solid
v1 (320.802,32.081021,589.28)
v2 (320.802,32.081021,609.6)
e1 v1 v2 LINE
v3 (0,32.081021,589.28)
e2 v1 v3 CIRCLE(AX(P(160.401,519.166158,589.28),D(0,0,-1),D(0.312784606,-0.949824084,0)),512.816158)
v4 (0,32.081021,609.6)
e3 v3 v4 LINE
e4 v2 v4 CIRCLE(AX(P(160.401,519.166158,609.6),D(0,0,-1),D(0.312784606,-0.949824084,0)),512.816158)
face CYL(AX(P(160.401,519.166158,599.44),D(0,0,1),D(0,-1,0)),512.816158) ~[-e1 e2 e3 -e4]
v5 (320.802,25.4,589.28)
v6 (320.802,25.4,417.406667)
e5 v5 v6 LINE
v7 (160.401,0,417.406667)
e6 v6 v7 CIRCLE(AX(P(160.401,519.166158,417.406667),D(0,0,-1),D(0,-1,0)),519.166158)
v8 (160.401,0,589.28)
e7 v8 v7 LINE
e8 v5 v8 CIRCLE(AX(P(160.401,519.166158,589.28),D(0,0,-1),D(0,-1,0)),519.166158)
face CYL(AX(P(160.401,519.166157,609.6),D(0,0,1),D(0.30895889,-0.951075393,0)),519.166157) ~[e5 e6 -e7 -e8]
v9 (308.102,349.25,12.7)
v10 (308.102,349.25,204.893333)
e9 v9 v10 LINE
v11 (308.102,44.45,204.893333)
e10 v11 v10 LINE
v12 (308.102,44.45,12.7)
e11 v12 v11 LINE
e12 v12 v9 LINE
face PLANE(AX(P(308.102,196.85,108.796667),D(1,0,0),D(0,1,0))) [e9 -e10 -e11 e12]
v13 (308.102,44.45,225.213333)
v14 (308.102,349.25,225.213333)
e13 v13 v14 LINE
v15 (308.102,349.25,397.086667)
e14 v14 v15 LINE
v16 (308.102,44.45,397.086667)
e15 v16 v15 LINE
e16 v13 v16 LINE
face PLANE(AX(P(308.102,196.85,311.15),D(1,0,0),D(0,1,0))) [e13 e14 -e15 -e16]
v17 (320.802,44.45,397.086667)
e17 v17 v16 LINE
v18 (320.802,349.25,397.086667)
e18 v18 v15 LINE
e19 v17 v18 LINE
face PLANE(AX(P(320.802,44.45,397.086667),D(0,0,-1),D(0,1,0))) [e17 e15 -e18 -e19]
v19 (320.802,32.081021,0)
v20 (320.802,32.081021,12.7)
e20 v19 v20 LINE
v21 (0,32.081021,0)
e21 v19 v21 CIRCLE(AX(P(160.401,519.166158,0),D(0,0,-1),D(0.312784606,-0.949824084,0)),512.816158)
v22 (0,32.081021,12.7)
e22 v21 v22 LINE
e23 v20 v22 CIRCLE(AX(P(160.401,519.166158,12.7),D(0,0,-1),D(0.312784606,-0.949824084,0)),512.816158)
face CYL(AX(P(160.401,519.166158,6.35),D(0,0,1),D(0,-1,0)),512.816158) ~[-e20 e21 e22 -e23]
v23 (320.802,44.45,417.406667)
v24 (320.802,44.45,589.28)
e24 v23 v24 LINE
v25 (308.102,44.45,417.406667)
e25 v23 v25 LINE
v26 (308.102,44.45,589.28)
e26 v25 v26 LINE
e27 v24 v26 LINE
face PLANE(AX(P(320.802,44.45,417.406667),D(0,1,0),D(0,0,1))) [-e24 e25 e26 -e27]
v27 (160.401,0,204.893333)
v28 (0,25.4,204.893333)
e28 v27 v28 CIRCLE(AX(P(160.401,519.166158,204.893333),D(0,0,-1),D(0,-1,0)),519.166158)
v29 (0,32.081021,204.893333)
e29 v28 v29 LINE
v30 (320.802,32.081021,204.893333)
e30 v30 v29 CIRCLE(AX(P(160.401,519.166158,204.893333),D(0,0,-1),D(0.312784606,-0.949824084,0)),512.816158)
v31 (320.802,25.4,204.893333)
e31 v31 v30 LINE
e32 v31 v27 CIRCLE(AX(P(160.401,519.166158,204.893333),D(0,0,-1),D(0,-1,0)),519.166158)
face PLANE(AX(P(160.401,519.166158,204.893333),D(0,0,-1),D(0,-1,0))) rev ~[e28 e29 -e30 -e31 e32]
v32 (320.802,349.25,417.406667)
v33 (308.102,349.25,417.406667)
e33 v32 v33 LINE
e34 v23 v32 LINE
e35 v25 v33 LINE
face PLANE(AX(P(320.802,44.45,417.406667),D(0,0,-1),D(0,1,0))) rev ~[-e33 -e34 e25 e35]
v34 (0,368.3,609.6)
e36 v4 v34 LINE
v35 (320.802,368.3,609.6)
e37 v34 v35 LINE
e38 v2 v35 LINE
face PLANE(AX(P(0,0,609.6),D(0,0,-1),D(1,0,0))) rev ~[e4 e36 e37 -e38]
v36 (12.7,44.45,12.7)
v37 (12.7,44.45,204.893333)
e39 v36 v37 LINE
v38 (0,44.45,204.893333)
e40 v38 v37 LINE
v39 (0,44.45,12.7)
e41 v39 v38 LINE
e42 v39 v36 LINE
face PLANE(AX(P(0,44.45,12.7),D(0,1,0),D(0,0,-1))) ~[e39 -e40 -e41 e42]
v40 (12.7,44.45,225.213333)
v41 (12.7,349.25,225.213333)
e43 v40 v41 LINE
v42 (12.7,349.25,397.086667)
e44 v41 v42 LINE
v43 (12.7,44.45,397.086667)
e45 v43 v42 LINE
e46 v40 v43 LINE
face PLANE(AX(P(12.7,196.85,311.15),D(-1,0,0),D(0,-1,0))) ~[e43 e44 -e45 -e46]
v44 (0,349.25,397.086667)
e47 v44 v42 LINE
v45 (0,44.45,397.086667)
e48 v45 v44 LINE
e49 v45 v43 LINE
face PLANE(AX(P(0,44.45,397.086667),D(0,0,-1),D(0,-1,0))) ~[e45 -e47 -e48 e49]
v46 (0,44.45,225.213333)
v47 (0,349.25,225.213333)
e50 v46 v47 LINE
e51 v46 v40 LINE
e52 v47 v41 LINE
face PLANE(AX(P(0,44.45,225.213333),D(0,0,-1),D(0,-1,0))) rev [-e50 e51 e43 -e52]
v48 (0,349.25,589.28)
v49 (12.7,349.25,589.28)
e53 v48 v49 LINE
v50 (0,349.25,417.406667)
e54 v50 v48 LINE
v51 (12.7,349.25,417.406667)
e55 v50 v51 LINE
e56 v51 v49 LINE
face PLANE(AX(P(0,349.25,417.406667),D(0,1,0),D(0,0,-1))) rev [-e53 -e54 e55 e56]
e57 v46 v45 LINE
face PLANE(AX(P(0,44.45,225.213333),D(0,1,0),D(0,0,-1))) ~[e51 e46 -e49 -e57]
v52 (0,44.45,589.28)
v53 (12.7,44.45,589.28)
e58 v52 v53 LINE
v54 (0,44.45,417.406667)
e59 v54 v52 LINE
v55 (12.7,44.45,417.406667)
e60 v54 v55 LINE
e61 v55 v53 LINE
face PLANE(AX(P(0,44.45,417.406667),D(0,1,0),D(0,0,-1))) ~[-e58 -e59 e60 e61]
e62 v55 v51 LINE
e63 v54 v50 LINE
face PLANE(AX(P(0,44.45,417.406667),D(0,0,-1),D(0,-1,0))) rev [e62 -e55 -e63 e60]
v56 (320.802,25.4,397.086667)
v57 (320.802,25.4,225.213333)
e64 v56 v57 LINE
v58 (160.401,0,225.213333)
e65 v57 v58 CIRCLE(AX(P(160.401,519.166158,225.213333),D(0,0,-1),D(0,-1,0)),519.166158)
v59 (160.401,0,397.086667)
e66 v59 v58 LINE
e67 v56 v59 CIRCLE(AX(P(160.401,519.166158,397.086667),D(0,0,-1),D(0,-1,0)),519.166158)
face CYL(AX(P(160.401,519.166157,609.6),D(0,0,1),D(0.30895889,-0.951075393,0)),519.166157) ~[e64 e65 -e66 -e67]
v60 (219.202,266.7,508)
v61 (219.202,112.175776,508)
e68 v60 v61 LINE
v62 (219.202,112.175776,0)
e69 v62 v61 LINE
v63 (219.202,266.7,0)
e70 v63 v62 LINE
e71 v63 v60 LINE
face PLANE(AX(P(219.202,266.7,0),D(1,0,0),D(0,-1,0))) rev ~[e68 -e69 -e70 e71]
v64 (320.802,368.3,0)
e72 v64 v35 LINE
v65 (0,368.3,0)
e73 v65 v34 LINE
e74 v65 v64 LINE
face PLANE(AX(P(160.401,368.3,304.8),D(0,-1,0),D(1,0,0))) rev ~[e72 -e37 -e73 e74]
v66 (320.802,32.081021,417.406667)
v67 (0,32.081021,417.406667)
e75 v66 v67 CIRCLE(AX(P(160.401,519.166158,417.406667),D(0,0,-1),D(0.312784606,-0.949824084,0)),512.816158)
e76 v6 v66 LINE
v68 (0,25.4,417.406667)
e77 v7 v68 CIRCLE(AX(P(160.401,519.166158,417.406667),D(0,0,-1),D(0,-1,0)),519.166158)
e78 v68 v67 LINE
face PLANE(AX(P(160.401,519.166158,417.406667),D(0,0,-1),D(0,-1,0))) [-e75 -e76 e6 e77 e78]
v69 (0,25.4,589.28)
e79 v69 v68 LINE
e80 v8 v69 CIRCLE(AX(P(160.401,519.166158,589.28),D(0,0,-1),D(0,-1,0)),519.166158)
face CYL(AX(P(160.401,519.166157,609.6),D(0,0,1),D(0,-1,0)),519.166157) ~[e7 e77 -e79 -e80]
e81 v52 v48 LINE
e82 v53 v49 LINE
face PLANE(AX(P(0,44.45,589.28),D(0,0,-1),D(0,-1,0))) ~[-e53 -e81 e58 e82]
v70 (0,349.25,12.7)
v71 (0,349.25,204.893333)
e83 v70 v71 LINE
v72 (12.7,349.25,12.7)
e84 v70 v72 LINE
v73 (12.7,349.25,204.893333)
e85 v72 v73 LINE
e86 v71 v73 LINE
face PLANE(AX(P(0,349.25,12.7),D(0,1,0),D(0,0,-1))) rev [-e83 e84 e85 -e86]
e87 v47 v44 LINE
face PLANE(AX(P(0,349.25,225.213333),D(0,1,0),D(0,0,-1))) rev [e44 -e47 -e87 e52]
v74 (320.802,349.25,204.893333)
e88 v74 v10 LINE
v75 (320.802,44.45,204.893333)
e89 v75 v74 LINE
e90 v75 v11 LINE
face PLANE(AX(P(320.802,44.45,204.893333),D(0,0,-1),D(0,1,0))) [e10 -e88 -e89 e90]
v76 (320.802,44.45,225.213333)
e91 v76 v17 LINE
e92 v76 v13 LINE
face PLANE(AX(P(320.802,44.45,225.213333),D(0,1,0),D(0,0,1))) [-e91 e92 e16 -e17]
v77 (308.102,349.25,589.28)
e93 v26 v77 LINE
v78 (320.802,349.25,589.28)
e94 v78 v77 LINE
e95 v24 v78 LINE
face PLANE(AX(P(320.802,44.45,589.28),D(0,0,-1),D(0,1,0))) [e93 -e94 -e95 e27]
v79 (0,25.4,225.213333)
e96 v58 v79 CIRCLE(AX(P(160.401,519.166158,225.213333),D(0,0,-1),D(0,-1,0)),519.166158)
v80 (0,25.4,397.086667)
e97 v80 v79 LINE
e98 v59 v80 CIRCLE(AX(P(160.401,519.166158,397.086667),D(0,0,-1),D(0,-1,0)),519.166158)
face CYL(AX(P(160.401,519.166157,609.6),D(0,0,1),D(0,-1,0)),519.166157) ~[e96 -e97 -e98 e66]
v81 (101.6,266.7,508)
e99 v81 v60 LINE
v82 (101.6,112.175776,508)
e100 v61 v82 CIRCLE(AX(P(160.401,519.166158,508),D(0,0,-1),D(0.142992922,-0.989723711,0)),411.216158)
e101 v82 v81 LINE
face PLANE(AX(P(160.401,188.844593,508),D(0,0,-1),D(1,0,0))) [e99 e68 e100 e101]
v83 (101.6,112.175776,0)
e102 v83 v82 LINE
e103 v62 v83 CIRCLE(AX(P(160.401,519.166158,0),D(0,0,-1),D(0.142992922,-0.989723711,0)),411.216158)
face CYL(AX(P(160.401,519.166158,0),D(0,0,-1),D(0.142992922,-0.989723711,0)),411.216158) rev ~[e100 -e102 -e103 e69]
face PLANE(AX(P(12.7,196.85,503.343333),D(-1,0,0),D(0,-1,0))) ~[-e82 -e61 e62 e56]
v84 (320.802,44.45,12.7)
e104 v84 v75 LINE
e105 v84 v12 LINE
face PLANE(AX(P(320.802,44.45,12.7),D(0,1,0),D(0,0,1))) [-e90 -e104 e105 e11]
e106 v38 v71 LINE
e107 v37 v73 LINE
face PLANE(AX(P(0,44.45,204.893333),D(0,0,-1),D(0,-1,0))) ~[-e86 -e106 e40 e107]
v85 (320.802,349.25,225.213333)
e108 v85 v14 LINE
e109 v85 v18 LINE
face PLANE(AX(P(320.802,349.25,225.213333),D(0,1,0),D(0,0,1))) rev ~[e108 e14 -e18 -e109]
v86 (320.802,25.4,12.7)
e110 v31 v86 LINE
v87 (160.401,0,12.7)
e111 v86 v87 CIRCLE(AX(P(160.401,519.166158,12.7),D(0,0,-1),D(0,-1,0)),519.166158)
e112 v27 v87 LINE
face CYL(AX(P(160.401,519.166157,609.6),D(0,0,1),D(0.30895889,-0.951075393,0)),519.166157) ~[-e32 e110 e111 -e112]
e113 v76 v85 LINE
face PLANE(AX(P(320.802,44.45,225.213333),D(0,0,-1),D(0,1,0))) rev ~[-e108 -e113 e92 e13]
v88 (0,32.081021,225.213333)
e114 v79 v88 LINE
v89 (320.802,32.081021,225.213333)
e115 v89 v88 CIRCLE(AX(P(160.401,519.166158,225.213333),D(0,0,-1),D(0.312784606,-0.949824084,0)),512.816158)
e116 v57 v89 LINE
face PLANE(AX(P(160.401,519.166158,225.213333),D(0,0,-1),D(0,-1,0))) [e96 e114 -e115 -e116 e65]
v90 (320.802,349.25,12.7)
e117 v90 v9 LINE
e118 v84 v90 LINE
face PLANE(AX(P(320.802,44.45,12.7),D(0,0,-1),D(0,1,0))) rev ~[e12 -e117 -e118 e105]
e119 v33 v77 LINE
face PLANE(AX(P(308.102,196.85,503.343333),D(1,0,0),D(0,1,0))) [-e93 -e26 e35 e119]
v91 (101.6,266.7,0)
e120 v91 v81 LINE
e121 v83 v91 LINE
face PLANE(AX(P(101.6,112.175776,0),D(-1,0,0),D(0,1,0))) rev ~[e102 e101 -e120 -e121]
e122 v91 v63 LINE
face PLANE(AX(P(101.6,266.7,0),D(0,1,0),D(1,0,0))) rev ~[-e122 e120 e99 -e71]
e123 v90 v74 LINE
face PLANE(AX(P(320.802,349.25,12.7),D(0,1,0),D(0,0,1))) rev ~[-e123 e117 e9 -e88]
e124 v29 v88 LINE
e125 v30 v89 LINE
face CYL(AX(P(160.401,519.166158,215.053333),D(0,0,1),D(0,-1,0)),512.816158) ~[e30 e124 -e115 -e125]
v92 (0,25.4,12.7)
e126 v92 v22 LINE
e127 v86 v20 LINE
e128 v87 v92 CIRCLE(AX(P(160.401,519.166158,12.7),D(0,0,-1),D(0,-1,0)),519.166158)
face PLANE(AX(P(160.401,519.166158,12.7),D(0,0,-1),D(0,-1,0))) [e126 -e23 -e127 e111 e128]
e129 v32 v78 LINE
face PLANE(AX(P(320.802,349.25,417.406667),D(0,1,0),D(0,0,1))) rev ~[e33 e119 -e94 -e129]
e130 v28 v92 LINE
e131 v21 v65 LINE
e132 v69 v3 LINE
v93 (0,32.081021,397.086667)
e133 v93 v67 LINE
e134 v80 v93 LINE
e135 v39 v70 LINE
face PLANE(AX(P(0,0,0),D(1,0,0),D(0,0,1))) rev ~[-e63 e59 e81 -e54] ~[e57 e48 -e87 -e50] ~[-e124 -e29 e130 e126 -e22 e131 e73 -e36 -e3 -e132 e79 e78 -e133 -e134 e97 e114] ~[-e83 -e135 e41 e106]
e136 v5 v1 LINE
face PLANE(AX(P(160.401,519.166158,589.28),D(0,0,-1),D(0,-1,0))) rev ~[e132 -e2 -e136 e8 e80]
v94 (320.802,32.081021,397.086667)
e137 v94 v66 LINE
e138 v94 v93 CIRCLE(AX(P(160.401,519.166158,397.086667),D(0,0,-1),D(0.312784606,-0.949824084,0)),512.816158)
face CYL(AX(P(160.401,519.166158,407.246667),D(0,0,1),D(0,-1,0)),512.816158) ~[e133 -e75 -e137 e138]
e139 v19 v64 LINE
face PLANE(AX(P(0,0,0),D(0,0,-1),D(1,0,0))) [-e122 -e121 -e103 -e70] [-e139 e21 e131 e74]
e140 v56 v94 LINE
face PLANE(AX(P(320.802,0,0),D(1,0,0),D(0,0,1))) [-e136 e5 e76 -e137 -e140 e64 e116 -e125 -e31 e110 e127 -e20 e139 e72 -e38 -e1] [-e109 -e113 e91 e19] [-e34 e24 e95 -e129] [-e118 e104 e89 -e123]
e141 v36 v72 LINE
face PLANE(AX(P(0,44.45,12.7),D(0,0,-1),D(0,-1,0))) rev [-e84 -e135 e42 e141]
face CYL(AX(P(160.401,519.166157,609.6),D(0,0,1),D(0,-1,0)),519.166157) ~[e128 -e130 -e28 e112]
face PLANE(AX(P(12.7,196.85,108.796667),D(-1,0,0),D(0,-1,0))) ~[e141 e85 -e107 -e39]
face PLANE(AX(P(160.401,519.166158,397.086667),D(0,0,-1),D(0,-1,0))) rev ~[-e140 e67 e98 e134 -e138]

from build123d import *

# Parameters (mm, degrees)
F0_W      = 320.802
F0_H      = 609.6
F1_DEPTH  = 368.3
F3_DEPTH  = 609.601
F6_W      = 6.35
F6_H      = 20.32
F6_H_2    = 12.7
F8_W      = 304.8
F8_H      = 171.8733333333
F8_H_2    = 192.1933333333
F9_DEPTH  = 12.7
F11_DEPTH = 508


# Not quite as in the source:
# - a pattern or mirror of a feature is missing from the dataset's text; its kind, count and spacing are read off the source's solid


with BuildPart() as f1:
    # F0 (on Front) → F1 (new body)
    with BuildSketch(Plane.XZ):
        with Locations((160.401, 304.8)):
            Rectangle(F0_W, F0_H)
    extrude(amount=-F1_DEPTH)

    # F2 (on face) → F3 (cut, through all)
    with BuildSketch(Plane.XY.offset(609.6)):
        with BuildLine():
            ThreePointArc((160.401, 0), (79.2011834962, 6.3893162785), (0, 25.4))
            Line((0, 25.4), (0, 0))
            Line((0, 0), (160.401, 0))
        make_face()
        with BuildLine():
            Line((320.802, 0), (320.802, 25.4))
            ThreePointArc((320.802, 25.4), (241.6008165038, 6.3893162785), (160.401, 0))
            Line((160.401, 0), (320.802, 0))
        make_face()
    extrude(amount=-F3_DEPTH, mode=Mode.SUBTRACT)

    # F6 (on mid) → F7 (revolve, cut)
    with BuildSketch(Plane.YZ.offset(160.401)):
        with Locations((3.175, 599.44)):
            Rectangle(F6_W, F6_H)
        with Locations((3.175, 407.2466666667)):
            Rectangle(F6_W, F6_H)
        with Locations((3.175, 215.0533333333)):
            Rectangle(F6_W, F6_H)
        with Locations((3.175, 6.35)):
            Rectangle(F6_W, F6_H_2)
    revolve(axis=Axis((160.401, 519.1661575, 538.612387991), (0, 0, -1)), mode=Mode.SUBTRACT)

    # F8 (on face) → F9 (cut)
    with BuildSketch(Plane.YZ.offset(320.802)):
        with Locations((196.85, 503.3433333333)):
            Rectangle(F8_W, F8_H)
        with Locations((196.85, 311.15)):
            Rectangle(F8_W, F8_H)
        with Locations((196.85, 108.7966666667)):
            Rectangle(F8_W, F8_H_2)
    f9 = extrude(amount=-F9_DEPTH, mode=Mode.SUBTRACT)

    # F9_copies: F9 across plane
    add(f9.mirror(Plane(origin=(160.401, 0, 0), x_dir=(0, 0, -1), z_dir=(-1, 0, 0))), mode=Mode.SUBTRACT)

    # F10 (on face) → F11 (cut)
    with BuildSketch(Plane(origin=(0, 0, 0), x_dir=(1, 0, 0), z_dir=(0, 0, -1))):
        with BuildLine():
            Line((101.6, -266.7), (219.202, -266.7))
            Line((219.202, -266.7), (219.202, -112.1757760558))
            ThreePointArc((219.202, -112.1757760558), (160.401, -107.95), (101.6, -112.1757760558))
            Line((101.6, -112.1757760558), (101.6, -266.7))
        make_face()
    extrude(amount=-F11_DEPTH, mode=Mode.SUBTRACT)


solid = f1.part
